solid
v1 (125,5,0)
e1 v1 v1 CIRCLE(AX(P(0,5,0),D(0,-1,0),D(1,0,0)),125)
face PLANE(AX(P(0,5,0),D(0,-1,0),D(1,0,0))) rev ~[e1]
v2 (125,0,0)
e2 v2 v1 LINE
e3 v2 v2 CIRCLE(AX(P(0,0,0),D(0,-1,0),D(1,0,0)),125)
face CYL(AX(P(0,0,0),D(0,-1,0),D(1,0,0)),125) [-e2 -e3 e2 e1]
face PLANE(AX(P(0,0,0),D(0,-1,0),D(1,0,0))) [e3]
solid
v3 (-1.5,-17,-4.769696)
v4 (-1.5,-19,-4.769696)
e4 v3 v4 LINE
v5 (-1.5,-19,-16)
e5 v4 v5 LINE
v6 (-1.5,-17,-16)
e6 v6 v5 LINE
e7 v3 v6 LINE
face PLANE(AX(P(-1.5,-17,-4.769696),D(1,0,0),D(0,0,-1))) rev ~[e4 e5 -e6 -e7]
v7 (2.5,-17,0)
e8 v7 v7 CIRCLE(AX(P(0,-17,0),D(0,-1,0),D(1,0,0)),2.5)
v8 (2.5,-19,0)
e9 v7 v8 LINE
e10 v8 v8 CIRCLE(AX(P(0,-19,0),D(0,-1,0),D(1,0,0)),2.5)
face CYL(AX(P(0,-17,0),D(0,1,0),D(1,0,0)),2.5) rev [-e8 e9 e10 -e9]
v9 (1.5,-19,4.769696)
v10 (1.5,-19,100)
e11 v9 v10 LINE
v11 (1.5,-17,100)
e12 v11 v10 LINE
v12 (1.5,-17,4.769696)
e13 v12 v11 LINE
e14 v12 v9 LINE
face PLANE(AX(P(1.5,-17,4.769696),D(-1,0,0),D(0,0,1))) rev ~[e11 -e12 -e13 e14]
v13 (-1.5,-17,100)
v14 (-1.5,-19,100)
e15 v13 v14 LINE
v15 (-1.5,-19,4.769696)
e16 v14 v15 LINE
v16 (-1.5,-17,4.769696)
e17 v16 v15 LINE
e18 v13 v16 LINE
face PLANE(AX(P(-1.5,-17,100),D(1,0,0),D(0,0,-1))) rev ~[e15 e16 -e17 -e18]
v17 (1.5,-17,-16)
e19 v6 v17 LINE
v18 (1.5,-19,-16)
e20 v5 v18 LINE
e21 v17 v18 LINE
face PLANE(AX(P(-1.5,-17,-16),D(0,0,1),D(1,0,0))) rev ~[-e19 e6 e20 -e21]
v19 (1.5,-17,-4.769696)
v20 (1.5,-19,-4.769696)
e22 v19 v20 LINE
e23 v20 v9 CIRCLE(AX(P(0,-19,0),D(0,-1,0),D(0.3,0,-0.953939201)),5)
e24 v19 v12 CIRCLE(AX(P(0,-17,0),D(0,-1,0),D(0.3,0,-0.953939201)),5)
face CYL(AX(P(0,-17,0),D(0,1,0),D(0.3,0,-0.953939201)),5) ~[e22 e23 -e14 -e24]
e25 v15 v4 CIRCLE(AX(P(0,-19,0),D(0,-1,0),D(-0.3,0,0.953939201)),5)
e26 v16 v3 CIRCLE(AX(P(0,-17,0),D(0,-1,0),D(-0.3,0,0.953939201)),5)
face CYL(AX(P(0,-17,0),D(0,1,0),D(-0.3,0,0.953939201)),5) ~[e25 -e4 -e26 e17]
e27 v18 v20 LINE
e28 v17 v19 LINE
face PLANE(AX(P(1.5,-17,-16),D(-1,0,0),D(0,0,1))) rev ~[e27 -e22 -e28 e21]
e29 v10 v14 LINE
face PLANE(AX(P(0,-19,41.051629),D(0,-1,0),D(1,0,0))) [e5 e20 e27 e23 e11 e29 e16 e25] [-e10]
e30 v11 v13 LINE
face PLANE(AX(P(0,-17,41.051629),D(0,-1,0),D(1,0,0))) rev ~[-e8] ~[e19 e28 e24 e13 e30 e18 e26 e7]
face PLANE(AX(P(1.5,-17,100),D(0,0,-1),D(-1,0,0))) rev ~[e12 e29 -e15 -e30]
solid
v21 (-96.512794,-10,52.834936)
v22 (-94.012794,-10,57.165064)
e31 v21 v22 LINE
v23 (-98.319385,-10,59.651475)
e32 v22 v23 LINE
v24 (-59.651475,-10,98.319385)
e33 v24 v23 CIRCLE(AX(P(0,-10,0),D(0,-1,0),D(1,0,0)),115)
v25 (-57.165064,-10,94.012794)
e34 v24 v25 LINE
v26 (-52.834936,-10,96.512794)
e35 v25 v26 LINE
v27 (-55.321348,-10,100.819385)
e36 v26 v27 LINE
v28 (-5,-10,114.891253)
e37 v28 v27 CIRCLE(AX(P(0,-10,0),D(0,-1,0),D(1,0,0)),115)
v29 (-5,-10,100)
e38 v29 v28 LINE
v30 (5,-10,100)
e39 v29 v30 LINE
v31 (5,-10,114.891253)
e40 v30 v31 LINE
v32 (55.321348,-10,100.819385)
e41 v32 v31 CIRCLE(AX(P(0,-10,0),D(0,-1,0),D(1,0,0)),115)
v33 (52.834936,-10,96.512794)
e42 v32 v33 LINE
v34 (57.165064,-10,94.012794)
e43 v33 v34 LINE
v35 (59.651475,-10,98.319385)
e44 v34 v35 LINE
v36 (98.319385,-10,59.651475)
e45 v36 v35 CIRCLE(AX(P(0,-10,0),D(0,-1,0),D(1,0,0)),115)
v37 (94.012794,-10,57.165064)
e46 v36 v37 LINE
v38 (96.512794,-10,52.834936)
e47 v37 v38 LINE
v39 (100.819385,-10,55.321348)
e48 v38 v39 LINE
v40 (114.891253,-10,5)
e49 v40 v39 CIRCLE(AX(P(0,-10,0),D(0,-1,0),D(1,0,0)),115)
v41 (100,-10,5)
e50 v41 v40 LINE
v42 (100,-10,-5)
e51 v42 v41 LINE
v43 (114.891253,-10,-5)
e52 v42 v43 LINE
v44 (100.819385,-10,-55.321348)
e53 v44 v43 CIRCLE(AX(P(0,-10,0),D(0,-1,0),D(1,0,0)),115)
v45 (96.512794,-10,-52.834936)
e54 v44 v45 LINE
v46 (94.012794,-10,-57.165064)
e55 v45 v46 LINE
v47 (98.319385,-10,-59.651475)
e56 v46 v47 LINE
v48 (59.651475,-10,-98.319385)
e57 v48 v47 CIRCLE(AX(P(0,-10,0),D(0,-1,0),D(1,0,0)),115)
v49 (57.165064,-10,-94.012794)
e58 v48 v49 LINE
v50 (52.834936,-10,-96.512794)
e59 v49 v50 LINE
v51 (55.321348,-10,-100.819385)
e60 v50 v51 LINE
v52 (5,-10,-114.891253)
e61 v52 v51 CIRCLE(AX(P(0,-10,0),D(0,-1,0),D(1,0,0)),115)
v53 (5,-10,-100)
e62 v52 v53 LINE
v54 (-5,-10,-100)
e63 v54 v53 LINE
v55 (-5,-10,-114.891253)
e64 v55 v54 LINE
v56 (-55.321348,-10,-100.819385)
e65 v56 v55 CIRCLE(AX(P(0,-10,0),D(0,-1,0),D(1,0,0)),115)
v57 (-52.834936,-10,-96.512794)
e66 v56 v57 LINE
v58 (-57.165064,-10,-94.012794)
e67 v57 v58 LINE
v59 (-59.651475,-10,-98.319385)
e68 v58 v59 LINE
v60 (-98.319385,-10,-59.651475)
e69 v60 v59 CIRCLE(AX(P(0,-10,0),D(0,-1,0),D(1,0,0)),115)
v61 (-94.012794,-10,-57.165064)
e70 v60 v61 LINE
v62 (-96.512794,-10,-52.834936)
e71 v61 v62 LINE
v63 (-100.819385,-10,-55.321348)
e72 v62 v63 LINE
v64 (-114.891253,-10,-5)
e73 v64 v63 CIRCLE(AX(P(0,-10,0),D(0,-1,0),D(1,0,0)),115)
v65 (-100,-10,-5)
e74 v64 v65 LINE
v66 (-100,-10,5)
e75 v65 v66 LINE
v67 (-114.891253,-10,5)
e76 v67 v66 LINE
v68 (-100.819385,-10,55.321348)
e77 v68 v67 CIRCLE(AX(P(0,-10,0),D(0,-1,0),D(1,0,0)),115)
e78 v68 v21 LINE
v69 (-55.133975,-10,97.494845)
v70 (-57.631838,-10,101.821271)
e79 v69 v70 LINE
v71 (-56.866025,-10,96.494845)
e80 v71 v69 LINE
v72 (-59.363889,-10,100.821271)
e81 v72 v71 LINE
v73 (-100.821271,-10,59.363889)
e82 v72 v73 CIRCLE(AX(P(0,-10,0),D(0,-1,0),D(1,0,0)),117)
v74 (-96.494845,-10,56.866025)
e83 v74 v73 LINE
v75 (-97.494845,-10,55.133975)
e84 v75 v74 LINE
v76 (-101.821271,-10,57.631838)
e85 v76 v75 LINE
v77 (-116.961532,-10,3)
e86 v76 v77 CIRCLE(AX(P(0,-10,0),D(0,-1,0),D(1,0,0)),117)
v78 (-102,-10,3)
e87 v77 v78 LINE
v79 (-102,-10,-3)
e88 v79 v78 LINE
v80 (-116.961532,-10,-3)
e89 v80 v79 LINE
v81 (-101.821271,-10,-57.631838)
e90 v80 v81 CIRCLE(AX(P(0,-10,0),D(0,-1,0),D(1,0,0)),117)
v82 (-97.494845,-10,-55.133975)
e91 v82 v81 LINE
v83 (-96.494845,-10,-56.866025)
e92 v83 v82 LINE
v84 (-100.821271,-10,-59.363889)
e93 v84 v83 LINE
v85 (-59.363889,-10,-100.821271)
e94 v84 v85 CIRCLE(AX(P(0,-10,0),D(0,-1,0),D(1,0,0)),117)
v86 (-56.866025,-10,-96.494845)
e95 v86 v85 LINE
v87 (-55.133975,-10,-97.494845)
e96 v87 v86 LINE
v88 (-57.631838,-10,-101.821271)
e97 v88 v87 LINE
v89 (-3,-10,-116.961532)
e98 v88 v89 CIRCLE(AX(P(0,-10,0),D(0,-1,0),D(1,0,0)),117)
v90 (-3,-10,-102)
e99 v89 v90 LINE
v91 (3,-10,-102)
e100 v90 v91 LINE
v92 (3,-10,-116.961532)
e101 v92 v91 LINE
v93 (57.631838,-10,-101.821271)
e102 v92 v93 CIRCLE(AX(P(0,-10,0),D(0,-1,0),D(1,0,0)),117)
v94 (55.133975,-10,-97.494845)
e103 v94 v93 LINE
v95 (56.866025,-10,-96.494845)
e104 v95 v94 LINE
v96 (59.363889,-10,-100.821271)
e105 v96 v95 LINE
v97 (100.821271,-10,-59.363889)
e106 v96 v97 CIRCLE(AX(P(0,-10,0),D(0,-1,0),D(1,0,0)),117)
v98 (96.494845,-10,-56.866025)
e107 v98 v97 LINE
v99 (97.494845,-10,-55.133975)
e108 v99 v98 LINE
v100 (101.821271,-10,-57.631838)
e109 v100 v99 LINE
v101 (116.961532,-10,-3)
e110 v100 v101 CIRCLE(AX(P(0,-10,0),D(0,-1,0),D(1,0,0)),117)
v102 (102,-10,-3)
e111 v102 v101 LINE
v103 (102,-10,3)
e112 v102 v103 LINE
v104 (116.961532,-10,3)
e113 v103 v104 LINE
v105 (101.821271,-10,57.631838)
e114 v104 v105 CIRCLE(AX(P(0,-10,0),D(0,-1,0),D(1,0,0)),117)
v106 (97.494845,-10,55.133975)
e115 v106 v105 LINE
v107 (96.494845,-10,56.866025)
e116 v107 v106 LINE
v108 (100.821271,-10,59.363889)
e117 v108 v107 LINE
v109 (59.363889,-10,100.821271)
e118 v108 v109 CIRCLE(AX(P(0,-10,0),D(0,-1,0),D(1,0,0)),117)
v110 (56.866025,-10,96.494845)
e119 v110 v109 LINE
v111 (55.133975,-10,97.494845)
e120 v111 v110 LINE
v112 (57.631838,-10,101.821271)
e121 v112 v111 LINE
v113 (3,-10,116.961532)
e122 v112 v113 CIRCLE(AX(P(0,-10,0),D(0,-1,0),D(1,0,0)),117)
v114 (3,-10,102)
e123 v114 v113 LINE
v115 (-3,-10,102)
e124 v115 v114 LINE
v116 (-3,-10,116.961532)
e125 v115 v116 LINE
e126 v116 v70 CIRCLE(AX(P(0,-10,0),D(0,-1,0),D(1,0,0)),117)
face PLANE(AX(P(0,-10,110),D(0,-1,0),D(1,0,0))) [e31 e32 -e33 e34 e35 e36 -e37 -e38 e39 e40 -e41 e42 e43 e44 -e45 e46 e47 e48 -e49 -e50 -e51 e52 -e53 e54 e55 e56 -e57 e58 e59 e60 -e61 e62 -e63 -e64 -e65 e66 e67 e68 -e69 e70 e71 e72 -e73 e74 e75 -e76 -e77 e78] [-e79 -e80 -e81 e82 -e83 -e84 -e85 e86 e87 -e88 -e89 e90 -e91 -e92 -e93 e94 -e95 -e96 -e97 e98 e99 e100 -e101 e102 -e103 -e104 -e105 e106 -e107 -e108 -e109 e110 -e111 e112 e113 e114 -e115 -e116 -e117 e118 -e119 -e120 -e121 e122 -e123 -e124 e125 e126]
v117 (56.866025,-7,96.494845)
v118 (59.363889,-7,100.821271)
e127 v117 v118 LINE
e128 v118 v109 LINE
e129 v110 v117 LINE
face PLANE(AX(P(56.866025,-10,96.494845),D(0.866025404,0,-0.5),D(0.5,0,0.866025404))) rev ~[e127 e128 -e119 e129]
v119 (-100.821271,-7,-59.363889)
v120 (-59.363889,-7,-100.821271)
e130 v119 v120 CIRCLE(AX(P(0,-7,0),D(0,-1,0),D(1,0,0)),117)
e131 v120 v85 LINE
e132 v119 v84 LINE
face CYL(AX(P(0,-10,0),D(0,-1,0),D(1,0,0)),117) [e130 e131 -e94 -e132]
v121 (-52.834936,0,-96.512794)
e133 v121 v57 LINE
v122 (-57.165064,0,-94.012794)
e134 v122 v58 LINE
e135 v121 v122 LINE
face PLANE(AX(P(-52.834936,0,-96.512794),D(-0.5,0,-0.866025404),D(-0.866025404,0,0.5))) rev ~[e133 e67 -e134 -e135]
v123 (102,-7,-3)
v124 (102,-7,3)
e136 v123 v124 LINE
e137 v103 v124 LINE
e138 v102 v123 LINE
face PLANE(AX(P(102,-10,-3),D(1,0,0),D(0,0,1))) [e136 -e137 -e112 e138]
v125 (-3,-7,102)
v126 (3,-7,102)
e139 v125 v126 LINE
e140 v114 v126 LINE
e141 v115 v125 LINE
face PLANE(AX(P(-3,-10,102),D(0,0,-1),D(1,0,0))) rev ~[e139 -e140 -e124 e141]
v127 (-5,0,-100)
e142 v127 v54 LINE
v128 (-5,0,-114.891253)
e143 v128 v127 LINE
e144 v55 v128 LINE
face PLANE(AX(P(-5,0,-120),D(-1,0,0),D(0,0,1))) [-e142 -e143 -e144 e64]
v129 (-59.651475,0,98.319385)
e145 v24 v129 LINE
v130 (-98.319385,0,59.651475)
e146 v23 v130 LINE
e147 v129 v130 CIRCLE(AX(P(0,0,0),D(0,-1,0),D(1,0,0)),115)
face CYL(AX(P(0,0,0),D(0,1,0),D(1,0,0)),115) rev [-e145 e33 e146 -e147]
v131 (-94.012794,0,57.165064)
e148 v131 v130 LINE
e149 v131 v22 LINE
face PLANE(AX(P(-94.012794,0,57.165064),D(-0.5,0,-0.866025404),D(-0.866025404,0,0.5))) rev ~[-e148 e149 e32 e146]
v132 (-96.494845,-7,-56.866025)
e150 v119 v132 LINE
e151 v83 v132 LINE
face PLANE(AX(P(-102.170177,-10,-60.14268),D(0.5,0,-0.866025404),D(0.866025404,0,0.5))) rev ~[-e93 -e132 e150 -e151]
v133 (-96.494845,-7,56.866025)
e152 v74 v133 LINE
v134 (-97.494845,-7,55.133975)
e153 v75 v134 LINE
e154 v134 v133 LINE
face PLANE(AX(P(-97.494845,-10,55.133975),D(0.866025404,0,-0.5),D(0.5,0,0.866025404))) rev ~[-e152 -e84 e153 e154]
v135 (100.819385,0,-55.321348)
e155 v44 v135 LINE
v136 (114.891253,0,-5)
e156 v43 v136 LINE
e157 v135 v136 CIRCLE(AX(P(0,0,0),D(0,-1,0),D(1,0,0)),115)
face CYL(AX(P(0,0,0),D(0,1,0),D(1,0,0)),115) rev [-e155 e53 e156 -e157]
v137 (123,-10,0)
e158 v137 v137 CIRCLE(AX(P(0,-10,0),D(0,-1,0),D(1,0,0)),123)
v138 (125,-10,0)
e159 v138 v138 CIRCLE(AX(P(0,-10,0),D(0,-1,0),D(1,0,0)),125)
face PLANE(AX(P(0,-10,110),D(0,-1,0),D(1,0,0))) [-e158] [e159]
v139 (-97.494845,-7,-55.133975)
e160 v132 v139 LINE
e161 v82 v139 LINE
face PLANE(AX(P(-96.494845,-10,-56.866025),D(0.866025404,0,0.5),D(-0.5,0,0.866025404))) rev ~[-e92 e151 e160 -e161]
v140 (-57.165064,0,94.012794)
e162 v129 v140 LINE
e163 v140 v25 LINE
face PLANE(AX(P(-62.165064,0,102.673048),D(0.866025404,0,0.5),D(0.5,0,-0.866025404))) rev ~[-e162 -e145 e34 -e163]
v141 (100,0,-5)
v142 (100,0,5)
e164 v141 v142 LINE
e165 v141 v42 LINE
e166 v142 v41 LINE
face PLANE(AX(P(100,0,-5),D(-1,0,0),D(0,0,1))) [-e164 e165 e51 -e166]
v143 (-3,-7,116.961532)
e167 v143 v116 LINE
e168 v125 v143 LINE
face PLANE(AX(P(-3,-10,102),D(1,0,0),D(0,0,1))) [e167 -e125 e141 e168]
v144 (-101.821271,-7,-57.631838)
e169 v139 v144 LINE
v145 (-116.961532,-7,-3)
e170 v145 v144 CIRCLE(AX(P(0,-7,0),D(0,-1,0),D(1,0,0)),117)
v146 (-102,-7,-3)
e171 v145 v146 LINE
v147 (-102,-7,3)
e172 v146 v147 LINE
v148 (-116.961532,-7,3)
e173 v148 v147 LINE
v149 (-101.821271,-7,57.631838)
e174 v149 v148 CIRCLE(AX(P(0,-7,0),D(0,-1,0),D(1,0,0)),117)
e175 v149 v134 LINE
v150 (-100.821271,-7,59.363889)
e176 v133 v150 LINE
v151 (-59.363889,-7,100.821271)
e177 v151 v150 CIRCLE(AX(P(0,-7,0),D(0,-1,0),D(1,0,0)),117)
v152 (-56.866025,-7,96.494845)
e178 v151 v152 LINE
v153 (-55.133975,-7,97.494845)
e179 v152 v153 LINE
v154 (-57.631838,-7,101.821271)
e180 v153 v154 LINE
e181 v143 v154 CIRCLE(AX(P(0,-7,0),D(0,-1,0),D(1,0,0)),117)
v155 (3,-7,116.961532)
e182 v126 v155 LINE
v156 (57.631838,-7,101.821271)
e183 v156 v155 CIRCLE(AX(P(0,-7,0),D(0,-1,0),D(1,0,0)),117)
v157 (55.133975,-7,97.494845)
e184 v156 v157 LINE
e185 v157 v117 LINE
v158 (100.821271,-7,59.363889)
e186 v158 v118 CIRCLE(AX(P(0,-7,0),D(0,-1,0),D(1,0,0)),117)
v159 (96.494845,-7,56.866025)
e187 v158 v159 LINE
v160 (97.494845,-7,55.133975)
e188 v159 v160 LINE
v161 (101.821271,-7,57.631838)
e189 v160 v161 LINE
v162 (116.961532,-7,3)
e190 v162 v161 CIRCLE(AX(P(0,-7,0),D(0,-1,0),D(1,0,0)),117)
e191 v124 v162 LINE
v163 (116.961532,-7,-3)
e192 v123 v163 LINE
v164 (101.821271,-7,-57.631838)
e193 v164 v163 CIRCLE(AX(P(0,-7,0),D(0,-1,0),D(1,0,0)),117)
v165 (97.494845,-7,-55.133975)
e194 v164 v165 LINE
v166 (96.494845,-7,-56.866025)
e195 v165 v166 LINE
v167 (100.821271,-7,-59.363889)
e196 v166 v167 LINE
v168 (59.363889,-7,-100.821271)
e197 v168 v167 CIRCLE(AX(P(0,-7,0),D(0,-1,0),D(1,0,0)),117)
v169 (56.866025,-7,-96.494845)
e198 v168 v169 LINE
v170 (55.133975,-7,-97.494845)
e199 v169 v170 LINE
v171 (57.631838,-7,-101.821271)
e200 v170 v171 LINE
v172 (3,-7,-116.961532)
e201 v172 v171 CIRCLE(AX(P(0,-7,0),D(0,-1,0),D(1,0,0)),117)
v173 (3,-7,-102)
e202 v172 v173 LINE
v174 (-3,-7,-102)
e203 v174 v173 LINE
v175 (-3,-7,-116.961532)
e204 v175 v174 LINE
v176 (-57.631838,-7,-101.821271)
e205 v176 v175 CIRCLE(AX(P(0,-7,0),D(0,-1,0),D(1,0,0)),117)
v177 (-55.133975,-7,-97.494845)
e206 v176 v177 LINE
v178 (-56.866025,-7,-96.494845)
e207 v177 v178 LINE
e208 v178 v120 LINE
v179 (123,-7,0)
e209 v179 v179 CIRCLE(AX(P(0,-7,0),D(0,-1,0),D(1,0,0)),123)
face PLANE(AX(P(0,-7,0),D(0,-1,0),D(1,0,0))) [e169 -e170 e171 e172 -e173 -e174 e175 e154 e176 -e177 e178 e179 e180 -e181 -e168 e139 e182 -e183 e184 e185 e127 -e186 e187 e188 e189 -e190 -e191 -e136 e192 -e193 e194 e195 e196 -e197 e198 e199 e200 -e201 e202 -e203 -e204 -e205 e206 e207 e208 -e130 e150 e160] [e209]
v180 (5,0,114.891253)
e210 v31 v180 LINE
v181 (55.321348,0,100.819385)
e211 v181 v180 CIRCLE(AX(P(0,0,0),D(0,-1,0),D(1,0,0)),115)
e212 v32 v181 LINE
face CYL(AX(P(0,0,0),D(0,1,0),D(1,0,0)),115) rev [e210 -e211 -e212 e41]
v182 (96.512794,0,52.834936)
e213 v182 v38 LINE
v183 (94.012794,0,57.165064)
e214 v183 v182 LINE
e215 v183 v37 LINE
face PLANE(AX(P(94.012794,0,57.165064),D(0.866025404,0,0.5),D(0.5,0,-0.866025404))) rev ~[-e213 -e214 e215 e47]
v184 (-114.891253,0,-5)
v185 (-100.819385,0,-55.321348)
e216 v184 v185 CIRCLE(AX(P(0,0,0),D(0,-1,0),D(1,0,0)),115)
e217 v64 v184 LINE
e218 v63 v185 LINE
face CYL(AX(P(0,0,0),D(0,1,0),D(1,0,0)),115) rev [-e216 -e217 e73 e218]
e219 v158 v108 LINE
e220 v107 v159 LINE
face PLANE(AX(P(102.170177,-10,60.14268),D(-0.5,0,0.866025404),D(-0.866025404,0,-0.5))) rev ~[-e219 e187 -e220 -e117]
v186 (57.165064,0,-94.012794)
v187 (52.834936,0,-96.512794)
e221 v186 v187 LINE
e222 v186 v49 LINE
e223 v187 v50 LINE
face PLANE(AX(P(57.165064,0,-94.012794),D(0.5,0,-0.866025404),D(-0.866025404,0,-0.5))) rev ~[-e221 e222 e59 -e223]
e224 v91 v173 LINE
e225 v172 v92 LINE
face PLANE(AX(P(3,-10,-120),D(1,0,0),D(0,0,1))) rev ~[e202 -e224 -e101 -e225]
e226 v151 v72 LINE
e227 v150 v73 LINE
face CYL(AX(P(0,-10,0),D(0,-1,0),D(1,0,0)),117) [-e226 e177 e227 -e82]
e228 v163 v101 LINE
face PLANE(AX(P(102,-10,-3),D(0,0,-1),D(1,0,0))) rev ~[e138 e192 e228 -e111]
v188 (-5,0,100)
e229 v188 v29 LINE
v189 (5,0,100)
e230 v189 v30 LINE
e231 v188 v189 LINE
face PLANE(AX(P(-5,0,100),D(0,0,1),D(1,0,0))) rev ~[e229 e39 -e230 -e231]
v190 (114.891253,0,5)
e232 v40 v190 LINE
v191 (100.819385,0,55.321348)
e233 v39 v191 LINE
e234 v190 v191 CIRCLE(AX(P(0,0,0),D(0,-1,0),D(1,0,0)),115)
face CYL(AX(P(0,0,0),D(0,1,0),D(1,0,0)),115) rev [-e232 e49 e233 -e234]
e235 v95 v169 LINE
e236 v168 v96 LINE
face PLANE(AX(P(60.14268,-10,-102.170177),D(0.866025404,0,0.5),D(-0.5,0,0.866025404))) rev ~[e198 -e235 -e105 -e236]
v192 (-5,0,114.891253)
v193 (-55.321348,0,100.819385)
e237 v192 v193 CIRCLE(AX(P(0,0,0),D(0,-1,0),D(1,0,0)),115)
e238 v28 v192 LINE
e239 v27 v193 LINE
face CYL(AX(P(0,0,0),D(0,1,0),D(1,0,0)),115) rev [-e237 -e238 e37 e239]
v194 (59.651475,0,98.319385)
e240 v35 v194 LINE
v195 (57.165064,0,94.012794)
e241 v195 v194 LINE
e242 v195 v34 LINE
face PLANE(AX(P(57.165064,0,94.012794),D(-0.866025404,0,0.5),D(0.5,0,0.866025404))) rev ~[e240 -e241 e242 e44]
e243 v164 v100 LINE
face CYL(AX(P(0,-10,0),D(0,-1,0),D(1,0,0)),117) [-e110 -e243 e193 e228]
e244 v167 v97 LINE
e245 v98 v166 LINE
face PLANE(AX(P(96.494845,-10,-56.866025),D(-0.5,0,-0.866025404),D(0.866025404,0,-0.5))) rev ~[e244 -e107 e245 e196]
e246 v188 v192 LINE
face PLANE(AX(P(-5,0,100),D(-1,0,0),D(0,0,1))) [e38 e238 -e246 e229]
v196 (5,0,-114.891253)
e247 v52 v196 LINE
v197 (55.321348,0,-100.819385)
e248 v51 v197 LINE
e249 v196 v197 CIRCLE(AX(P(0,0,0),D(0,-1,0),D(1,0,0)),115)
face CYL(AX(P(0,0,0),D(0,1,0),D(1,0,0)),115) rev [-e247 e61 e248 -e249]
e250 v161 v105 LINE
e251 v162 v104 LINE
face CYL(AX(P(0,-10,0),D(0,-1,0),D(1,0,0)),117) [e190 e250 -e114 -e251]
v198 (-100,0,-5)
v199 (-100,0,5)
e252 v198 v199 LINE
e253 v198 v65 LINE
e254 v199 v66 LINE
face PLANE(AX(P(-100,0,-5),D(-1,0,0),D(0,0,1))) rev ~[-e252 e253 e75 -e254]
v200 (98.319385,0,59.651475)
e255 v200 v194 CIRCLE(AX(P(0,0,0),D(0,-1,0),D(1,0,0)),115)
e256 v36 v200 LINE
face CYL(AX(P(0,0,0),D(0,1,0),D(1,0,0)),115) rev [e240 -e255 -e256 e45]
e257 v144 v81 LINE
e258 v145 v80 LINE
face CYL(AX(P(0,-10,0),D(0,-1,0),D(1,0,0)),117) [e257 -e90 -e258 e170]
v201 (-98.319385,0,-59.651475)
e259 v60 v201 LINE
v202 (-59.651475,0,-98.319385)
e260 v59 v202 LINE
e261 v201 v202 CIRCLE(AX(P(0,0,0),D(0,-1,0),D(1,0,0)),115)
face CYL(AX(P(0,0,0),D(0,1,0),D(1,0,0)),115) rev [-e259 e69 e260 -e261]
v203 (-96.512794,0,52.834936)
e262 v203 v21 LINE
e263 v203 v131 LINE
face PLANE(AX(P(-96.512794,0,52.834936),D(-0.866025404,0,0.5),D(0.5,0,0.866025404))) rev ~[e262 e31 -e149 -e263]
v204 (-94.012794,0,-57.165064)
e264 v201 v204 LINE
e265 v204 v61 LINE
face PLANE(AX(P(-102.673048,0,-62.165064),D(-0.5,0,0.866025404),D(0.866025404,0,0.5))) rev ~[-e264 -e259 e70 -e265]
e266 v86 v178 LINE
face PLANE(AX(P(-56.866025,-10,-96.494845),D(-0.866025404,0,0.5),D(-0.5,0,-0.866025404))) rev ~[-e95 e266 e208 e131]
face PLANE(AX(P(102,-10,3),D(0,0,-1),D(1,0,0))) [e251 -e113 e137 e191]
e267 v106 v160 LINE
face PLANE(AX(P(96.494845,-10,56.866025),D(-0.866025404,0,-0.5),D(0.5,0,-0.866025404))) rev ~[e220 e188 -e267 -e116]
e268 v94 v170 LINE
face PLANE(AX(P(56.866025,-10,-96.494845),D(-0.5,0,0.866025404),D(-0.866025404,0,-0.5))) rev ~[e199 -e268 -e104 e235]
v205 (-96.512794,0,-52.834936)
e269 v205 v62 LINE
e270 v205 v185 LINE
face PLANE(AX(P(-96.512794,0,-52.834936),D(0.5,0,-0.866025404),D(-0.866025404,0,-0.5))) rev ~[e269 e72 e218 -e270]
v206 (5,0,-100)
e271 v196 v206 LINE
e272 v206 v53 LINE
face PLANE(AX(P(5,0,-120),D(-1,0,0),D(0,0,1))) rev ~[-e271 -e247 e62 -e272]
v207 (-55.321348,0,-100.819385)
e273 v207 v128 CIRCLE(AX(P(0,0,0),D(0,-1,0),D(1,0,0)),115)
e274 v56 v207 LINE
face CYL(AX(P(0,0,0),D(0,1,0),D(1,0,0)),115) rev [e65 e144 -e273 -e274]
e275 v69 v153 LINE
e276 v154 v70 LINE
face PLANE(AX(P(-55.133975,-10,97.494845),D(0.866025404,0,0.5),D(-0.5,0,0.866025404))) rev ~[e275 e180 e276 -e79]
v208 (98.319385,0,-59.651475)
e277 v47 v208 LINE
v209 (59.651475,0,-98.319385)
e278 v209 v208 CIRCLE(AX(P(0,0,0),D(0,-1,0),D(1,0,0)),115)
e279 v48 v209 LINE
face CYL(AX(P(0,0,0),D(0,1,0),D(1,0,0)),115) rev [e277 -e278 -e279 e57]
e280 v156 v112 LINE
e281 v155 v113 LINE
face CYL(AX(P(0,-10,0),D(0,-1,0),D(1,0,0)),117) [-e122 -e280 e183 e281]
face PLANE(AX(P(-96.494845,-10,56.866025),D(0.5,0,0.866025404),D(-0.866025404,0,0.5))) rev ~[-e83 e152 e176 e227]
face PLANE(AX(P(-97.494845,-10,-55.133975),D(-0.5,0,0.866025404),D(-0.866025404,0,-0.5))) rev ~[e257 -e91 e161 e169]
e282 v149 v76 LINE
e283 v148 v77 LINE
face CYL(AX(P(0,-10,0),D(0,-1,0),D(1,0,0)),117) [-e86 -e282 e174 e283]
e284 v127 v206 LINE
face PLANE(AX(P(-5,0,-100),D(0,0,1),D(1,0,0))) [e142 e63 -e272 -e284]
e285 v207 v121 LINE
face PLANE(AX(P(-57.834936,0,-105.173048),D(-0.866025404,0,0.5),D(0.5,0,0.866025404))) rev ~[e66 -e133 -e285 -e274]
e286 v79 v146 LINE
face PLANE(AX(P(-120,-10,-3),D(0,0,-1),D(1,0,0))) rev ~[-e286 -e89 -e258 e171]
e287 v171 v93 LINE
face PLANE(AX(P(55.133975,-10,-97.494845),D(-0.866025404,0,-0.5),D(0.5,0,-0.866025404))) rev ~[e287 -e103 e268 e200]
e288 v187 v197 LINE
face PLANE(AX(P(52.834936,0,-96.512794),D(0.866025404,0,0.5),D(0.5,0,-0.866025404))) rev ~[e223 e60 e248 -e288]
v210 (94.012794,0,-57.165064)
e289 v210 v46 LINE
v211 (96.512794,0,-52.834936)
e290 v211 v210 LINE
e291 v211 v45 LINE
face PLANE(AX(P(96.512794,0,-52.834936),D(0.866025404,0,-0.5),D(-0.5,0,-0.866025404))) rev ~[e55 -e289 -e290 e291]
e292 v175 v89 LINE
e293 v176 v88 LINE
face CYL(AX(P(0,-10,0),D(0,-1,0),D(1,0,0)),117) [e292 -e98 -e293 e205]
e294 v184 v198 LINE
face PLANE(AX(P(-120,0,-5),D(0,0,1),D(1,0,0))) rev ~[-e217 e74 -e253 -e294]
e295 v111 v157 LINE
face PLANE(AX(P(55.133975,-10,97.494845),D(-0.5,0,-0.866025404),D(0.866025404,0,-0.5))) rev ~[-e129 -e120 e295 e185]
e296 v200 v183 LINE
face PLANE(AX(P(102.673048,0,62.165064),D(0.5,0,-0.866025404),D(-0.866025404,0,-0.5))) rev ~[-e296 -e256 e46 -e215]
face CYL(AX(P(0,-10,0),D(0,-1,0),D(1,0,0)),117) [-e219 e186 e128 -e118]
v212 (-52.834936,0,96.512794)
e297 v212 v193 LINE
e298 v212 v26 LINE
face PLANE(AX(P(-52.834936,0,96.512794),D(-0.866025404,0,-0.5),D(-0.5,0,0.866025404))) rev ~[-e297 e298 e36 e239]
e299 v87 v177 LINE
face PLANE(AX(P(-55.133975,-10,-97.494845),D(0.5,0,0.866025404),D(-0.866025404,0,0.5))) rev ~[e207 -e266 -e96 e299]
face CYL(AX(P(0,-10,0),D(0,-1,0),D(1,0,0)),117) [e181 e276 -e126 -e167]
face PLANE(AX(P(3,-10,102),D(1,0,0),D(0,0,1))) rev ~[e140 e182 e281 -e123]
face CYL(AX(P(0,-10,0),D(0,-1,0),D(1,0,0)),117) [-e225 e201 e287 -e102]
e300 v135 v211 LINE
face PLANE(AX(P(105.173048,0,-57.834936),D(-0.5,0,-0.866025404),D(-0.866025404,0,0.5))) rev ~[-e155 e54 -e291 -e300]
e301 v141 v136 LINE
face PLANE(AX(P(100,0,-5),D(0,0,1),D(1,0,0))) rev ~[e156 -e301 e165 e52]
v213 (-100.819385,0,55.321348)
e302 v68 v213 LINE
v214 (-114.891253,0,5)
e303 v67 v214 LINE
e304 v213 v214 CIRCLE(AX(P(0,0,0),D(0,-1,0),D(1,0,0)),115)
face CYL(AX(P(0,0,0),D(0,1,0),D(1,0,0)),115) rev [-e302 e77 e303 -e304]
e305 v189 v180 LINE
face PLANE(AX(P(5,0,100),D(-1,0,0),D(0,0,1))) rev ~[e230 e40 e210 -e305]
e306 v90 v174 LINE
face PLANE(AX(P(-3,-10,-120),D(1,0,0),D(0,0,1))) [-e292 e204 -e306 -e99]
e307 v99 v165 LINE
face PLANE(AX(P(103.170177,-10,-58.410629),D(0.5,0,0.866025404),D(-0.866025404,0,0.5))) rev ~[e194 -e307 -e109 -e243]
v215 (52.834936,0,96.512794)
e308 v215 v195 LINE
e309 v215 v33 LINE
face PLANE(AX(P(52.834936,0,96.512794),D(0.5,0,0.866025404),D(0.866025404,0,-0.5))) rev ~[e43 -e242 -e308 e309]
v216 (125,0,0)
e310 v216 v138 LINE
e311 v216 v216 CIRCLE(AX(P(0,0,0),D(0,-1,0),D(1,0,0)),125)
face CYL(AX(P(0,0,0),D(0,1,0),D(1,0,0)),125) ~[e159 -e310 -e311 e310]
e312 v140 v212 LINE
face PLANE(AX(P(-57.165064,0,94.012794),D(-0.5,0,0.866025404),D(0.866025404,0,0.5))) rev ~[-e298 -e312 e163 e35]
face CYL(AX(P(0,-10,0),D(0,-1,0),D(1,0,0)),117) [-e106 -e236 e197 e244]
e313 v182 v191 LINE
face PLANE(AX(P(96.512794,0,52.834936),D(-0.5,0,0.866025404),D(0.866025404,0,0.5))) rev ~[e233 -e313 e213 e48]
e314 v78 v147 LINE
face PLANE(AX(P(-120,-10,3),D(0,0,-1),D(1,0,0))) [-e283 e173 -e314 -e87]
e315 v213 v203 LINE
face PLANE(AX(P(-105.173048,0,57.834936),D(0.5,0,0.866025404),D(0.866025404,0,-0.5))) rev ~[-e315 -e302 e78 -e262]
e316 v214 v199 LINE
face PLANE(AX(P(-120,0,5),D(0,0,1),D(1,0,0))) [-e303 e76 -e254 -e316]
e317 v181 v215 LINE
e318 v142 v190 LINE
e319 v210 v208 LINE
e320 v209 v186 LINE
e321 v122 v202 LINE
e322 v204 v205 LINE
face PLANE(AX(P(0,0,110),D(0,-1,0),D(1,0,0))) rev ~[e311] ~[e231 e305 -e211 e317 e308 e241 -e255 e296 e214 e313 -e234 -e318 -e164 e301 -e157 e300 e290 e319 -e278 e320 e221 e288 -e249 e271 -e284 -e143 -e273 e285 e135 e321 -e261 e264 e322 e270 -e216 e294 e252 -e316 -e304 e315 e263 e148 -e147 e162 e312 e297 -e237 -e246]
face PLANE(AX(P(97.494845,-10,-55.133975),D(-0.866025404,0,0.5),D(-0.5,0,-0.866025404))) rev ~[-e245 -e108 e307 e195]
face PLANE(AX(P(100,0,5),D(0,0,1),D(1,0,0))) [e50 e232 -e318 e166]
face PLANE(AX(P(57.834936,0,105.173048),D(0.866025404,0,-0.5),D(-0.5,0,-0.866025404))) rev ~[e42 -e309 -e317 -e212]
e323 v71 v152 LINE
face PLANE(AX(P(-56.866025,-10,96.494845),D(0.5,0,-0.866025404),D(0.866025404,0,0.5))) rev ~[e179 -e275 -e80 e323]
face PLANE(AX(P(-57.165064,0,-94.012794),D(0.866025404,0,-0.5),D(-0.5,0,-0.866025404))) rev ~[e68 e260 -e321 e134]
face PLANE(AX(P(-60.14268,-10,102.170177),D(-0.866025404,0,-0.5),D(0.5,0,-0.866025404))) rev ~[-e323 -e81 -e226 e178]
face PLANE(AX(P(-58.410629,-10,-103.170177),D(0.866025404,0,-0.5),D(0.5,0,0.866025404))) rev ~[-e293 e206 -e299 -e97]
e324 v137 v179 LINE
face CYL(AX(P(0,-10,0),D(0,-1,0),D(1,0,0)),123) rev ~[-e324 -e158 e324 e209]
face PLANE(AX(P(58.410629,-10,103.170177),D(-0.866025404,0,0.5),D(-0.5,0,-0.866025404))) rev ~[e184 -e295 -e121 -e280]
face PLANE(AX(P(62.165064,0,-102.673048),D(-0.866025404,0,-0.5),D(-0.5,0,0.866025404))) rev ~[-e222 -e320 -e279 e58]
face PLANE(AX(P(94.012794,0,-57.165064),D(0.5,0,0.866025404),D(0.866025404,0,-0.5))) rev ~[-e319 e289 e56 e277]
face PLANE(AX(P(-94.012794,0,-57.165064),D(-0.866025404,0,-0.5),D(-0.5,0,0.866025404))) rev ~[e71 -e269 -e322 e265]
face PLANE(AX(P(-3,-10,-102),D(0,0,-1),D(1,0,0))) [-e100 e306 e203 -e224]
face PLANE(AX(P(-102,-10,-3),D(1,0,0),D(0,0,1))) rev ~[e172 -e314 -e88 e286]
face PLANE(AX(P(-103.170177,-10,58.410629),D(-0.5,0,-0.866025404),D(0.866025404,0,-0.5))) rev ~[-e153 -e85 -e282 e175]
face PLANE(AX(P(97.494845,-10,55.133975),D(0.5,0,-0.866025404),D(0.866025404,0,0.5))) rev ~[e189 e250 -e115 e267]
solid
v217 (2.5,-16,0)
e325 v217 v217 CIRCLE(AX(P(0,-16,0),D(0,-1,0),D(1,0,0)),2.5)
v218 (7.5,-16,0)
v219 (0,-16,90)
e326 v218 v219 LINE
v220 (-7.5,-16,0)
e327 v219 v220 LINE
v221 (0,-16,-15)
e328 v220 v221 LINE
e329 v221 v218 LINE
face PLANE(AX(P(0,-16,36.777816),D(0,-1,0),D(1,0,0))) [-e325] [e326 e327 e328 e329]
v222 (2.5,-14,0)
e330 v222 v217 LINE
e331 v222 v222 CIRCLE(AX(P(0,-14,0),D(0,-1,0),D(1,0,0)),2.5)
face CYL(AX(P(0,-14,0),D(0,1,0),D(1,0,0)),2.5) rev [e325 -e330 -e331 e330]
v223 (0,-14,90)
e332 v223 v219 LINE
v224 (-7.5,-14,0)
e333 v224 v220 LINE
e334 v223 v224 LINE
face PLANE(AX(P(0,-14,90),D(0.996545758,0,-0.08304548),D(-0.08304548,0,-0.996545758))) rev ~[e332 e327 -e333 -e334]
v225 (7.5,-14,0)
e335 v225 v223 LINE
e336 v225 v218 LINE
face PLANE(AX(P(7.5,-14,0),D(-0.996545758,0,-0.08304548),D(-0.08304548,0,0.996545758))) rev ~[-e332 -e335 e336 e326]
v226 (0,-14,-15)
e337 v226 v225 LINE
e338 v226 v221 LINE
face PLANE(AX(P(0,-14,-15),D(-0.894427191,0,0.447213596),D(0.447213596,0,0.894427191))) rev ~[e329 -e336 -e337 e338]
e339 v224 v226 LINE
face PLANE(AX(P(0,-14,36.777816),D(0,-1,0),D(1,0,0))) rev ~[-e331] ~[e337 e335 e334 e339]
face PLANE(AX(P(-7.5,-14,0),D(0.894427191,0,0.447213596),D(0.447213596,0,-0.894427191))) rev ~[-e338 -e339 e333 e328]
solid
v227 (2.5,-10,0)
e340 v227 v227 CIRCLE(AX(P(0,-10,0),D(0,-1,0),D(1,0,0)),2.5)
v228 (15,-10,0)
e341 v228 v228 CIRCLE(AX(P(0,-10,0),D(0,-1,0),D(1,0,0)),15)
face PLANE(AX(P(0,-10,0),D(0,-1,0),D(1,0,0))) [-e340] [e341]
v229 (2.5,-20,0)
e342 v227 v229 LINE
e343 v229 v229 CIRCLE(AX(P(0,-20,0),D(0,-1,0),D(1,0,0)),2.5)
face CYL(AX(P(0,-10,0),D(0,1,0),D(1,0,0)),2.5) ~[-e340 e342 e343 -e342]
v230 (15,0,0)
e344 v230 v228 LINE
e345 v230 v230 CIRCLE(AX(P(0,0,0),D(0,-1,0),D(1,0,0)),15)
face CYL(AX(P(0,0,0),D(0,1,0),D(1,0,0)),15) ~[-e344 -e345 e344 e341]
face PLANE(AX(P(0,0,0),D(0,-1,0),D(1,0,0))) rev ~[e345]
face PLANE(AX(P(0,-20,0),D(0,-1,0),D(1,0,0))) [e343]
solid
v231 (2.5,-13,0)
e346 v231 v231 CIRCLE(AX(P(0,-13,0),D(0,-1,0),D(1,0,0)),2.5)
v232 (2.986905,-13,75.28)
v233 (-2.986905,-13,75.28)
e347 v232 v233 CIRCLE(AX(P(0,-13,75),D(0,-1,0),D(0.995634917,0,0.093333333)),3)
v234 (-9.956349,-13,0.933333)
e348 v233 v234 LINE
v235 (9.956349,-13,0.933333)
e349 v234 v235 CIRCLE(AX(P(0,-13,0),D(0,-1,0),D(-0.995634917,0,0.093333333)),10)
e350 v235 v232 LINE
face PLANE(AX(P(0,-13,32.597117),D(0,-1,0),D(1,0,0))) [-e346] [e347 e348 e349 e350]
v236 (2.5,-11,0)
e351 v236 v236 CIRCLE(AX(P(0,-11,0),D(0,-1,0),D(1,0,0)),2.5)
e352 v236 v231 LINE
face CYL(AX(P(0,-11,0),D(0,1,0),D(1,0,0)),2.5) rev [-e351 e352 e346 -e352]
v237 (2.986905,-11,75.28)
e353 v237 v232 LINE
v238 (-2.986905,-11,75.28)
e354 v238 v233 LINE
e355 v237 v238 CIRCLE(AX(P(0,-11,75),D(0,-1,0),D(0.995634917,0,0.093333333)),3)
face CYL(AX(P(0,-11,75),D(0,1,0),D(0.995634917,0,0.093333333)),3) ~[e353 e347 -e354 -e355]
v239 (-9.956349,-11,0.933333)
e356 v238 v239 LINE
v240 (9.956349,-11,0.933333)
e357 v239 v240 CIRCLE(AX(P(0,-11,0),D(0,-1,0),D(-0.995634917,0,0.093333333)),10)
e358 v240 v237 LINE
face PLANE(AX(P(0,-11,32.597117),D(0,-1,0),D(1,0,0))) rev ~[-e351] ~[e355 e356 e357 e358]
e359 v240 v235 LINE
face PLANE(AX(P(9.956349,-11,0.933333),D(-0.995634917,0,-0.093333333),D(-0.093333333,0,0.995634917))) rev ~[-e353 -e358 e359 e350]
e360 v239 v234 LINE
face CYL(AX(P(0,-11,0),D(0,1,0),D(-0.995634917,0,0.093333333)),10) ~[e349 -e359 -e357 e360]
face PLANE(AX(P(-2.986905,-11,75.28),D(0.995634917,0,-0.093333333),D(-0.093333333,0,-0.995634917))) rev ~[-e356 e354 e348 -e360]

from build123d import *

# Parameters (mm, degrees)
F0_R      = 125
F1_DEPTH  = 5
F2_R      = 15
F3_DEPTH  = 10
F4_R      = 2.5
F5_DEPTH  = 10
F6_R      = 125
F6_R_2    = 115
F7_DEPTH  = 10
F8_W      = 10
F8_H      = 20
F8_W_2    = 20
F8_H_2    = 10
F9_DEPTH  = 10
F11_DEPTH = 10
F12_R     = 123
F12_R_2   = 117
F13_DEPTH = 3
F14_W     = 6
F14_H     = 18
F14_W_2   = 18
F14_H_2   = 6
F15_DEPTH = 3
F17_DEPTH = 3
F19_R     = 2.5
F20_DEPTH = 2
F22_R     = 2.5
F23_DEPTH = 2
F25_R     = 2.5
F26_DEPTH = 2


with BuildPart() as f1:
    # F0 (on Front) → F1 (new body)
    with BuildSketch(Plane.XZ):
        Circle(F0_R)
    extrude(amount=-F1_DEPTH)


with BuildPart() as f3:
    # F2 (on face) → F3 (new body)
    with BuildSketch(Plane.XZ):
        Circle(F2_R)
    extrude(amount=F3_DEPTH)

    # F4 (on face) → F5 (join)
    with BuildSketch(Plane.XZ.offset(10)):
        Circle(F4_R)
    extrude(amount=F5_DEPTH)


with BuildPart() as f7:
    # F6 (on face) → F7 (new body)
    with BuildSketch(Plane.XZ):
        Circle(F6_R)
        Circle(F6_R_2, mode=Mode.SUBTRACT)
    extrude(amount=F7_DEPTH)

    # F8 (on face) → F9 (join)
    with BuildSketch(Plane.XZ):
        with Locations((0, 110)):
            Rectangle(F8_W, F8_H)
        with Locations((-110, 0)):
            Rectangle(F8_W_2, F8_H_2)
        with Locations((0, -110)):
            Rectangle(F8_W, F8_H)
        with Locations((110, 0)):
            Rectangle(F8_W_2, F8_H_2)
    extrude(amount=F9_DEPTH)

    # F10 (on face) → F11 (join)
    with BuildSketch(Plane.XZ):
        Polygon((62.1650635095, 102.6730484541), (57.8349364905, 105.1730484541), (52.8349364905, 96.5127944163), (57.1650635095, 94.0127944163), align=None)
        Polygon((105.1730484541, 57.8349364905), (102.6730484541, 62.1650635095), (94.0127944163, 57.1650635095), (96.5127944163, 52.8349364905), align=None)
        Polygon((-102.6730484541, 62.1650635095), (-105.1730484541, 57.8349364905), (-96.5127944163, 52.8349364905), (-94.0127944163, 57.1650635095), align=None)
        Polygon((-57.8349364905, 105.1730484541), (-62.1650635095, 102.6730484541), (-57.1650635095, 94.0127944163), (-52.8349364905, 96.5127944163), align=None)
        Polygon((-62.1650635095, -102.6730484541), (-57.8349364905, -105.1730484541), (-52.8349364905, -96.5127944163), (-57.1650635095, -94.0127944163), align=None)
        Polygon((-105.1730484541, -57.8349364905), (-102.6730484541, -62.1650635095), (-94.0127944163, -57.1650635095), (-96.5127944163, -52.8349364905), align=None)
        Polygon((102.6730484541, -62.1650635095), (105.1730484541, -57.8349364905), (96.5127944163, -52.8349364905), (94.0127944163, -57.1650635095), align=None)
        Polygon((57.8349364905, -105.1730484541), (62.1650635095, -102.6730484541), (57.1650635095, -94.0127944163), (52.8349364905, -96.5127944163), align=None)
    extrude(amount=F11_DEPTH)

    # F12 (on face) → F13 (cut)
    with BuildSketch(Plane.XZ.offset(10)):
        Circle(F12_R)
        Circle(F12_R_2, mode=Mode.SUBTRACT)
    extrude(amount=-F13_DEPTH, mode=Mode.SUBTRACT)

    # F14 (on face) → F15 (cut)
    with BuildSketch(Plane.XZ.offset(10)):
        with Locations((0, 111)):
            Rectangle(F14_W, F14_H)
        with Locations((-111, 0)):
            Rectangle(F14_W_2, F14_H_2)
        with Locations((0, -111)):
            Rectangle(F14_W, F14_H)
        with Locations((111, 0)):
            Rectangle(F14_W_2, F14_H_2)
    extrude(amount=-F15_DEPTH, mode=Mode.SUBTRACT)

    # F16 (on face) → F17 (cut)
    with BuildSketch(Plane.XZ.offset(10)):
        Polygon((60.142679841, 102.1701771879), (58.4106290334, 103.1701771879), (55.1339745962, 97.4948452239), (56.8660254038, 96.4948452239), align=None)
        Polygon((103.1701771879, 58.4106290334), (102.1701771879, 60.142679841), (96.4948452239, 56.8660254038), (97.4948452239, 55.1339745962), align=None)
        Polygon((-55.1339745962, 97.4948452239), (-58.4106290334, 103.1701771879), (-60.142679841, 102.1701771879), (-56.8660254038, 96.4948452239), align=None)
        Polygon((-96.4948452239, 56.8660254038), (-102.1701771879, 60.142679841), (-103.1701771879, 58.4106290334), (-97.4948452239, 55.1339745962), align=None)
        Polygon((-97.4948452239, -55.1339745962), (-103.1701771879, -58.4106290334), (-102.1701771879, -60.142679841), (-96.4948452239, -56.8660254038), align=None)
        Polygon((-56.8660254038, -96.4948452239), (-60.142679841, -102.1701771879), (-58.4106290334, -103.1701771879), (-55.1339745962, -97.4948452239), align=None)
        Polygon((55.1339745962, -97.4948452239), (58.4106290334, -103.1701771879), (60.142679841, -102.1701771879), (56.8660254038, -96.4948452239), align=None)
        Polygon((96.4948452239, -56.8660254038), (102.1701771879, -60.142679841), (103.1701771879, -58.4106290334), (97.4948452239, -55.1339745962), align=None)
    extrude(amount=-F17_DEPTH, mode=Mode.SUBTRACT)


with BuildPart() as f20:
    # F19 (on offset) → F20 (new body)
    with BuildSketch(Plane.XZ.offset(11)):
        with BuildLine():
            ThreePointArc((2.9869047524, 75.28), (0, 78), (-2.9869047524, 75.28))
            Line((-2.9869047524, 75.28), (-9.9563491747, 0.9333333333))
            ThreePointArc((-9.9563491747, 0.9333333333), (0, -10), (9.9563491747, 0.9333333333))
            Line((9.9563491747, 0.9333333333), (2.9869047524, 75.28))
        make_face()
        Circle(F19_R, mode=Mode.SUBTRACT)
    extrude(amount=F20_DEPTH)


with BuildPart() as f23:
    # F22 (on offset) → F23 (new body)
    with BuildSketch(Plane.XZ.offset(14)):
        Polygon((7.5, 0), (0, 90), (-7.5, 0), (0, -15), align=None)
        Circle(F22_R, mode=Mode.SUBTRACT)
    extrude(amount=F23_DEPTH)


with BuildPart() as f26:
    # F25 (on offset) → F26 (new body)
    with BuildSketch(Plane.XZ.offset(17)):
        with BuildLine():
            Line((1.5, -16), (1.5, -4.7696960071))
            ThreePointArc((1.5, -4.7696960071), (5, 0), (1.5, 4.7696960071))
            Line((1.5, 4.7696960071), (1.5, 100))
            Line((1.5, 100), (-1.5, 100))
            Line((-1.5, 100), (-1.5, 4.7696960071))
            ThreePointArc((-1.5, 4.7696960071), (-5, 0), (-1.5, -4.7696960071))
            Line((-1.5, -4.7696960071), (-1.5, -16))
            Line((-1.5, -16), (1.5, -16))
        make_face()
        Circle(F25_R, mode=Mode.SUBTRACT)
    extrude(amount=F26_DEPTH)


solid = Compound([f1.part, f3.part, f7.part, f20.part, f23.part, f26.part])
